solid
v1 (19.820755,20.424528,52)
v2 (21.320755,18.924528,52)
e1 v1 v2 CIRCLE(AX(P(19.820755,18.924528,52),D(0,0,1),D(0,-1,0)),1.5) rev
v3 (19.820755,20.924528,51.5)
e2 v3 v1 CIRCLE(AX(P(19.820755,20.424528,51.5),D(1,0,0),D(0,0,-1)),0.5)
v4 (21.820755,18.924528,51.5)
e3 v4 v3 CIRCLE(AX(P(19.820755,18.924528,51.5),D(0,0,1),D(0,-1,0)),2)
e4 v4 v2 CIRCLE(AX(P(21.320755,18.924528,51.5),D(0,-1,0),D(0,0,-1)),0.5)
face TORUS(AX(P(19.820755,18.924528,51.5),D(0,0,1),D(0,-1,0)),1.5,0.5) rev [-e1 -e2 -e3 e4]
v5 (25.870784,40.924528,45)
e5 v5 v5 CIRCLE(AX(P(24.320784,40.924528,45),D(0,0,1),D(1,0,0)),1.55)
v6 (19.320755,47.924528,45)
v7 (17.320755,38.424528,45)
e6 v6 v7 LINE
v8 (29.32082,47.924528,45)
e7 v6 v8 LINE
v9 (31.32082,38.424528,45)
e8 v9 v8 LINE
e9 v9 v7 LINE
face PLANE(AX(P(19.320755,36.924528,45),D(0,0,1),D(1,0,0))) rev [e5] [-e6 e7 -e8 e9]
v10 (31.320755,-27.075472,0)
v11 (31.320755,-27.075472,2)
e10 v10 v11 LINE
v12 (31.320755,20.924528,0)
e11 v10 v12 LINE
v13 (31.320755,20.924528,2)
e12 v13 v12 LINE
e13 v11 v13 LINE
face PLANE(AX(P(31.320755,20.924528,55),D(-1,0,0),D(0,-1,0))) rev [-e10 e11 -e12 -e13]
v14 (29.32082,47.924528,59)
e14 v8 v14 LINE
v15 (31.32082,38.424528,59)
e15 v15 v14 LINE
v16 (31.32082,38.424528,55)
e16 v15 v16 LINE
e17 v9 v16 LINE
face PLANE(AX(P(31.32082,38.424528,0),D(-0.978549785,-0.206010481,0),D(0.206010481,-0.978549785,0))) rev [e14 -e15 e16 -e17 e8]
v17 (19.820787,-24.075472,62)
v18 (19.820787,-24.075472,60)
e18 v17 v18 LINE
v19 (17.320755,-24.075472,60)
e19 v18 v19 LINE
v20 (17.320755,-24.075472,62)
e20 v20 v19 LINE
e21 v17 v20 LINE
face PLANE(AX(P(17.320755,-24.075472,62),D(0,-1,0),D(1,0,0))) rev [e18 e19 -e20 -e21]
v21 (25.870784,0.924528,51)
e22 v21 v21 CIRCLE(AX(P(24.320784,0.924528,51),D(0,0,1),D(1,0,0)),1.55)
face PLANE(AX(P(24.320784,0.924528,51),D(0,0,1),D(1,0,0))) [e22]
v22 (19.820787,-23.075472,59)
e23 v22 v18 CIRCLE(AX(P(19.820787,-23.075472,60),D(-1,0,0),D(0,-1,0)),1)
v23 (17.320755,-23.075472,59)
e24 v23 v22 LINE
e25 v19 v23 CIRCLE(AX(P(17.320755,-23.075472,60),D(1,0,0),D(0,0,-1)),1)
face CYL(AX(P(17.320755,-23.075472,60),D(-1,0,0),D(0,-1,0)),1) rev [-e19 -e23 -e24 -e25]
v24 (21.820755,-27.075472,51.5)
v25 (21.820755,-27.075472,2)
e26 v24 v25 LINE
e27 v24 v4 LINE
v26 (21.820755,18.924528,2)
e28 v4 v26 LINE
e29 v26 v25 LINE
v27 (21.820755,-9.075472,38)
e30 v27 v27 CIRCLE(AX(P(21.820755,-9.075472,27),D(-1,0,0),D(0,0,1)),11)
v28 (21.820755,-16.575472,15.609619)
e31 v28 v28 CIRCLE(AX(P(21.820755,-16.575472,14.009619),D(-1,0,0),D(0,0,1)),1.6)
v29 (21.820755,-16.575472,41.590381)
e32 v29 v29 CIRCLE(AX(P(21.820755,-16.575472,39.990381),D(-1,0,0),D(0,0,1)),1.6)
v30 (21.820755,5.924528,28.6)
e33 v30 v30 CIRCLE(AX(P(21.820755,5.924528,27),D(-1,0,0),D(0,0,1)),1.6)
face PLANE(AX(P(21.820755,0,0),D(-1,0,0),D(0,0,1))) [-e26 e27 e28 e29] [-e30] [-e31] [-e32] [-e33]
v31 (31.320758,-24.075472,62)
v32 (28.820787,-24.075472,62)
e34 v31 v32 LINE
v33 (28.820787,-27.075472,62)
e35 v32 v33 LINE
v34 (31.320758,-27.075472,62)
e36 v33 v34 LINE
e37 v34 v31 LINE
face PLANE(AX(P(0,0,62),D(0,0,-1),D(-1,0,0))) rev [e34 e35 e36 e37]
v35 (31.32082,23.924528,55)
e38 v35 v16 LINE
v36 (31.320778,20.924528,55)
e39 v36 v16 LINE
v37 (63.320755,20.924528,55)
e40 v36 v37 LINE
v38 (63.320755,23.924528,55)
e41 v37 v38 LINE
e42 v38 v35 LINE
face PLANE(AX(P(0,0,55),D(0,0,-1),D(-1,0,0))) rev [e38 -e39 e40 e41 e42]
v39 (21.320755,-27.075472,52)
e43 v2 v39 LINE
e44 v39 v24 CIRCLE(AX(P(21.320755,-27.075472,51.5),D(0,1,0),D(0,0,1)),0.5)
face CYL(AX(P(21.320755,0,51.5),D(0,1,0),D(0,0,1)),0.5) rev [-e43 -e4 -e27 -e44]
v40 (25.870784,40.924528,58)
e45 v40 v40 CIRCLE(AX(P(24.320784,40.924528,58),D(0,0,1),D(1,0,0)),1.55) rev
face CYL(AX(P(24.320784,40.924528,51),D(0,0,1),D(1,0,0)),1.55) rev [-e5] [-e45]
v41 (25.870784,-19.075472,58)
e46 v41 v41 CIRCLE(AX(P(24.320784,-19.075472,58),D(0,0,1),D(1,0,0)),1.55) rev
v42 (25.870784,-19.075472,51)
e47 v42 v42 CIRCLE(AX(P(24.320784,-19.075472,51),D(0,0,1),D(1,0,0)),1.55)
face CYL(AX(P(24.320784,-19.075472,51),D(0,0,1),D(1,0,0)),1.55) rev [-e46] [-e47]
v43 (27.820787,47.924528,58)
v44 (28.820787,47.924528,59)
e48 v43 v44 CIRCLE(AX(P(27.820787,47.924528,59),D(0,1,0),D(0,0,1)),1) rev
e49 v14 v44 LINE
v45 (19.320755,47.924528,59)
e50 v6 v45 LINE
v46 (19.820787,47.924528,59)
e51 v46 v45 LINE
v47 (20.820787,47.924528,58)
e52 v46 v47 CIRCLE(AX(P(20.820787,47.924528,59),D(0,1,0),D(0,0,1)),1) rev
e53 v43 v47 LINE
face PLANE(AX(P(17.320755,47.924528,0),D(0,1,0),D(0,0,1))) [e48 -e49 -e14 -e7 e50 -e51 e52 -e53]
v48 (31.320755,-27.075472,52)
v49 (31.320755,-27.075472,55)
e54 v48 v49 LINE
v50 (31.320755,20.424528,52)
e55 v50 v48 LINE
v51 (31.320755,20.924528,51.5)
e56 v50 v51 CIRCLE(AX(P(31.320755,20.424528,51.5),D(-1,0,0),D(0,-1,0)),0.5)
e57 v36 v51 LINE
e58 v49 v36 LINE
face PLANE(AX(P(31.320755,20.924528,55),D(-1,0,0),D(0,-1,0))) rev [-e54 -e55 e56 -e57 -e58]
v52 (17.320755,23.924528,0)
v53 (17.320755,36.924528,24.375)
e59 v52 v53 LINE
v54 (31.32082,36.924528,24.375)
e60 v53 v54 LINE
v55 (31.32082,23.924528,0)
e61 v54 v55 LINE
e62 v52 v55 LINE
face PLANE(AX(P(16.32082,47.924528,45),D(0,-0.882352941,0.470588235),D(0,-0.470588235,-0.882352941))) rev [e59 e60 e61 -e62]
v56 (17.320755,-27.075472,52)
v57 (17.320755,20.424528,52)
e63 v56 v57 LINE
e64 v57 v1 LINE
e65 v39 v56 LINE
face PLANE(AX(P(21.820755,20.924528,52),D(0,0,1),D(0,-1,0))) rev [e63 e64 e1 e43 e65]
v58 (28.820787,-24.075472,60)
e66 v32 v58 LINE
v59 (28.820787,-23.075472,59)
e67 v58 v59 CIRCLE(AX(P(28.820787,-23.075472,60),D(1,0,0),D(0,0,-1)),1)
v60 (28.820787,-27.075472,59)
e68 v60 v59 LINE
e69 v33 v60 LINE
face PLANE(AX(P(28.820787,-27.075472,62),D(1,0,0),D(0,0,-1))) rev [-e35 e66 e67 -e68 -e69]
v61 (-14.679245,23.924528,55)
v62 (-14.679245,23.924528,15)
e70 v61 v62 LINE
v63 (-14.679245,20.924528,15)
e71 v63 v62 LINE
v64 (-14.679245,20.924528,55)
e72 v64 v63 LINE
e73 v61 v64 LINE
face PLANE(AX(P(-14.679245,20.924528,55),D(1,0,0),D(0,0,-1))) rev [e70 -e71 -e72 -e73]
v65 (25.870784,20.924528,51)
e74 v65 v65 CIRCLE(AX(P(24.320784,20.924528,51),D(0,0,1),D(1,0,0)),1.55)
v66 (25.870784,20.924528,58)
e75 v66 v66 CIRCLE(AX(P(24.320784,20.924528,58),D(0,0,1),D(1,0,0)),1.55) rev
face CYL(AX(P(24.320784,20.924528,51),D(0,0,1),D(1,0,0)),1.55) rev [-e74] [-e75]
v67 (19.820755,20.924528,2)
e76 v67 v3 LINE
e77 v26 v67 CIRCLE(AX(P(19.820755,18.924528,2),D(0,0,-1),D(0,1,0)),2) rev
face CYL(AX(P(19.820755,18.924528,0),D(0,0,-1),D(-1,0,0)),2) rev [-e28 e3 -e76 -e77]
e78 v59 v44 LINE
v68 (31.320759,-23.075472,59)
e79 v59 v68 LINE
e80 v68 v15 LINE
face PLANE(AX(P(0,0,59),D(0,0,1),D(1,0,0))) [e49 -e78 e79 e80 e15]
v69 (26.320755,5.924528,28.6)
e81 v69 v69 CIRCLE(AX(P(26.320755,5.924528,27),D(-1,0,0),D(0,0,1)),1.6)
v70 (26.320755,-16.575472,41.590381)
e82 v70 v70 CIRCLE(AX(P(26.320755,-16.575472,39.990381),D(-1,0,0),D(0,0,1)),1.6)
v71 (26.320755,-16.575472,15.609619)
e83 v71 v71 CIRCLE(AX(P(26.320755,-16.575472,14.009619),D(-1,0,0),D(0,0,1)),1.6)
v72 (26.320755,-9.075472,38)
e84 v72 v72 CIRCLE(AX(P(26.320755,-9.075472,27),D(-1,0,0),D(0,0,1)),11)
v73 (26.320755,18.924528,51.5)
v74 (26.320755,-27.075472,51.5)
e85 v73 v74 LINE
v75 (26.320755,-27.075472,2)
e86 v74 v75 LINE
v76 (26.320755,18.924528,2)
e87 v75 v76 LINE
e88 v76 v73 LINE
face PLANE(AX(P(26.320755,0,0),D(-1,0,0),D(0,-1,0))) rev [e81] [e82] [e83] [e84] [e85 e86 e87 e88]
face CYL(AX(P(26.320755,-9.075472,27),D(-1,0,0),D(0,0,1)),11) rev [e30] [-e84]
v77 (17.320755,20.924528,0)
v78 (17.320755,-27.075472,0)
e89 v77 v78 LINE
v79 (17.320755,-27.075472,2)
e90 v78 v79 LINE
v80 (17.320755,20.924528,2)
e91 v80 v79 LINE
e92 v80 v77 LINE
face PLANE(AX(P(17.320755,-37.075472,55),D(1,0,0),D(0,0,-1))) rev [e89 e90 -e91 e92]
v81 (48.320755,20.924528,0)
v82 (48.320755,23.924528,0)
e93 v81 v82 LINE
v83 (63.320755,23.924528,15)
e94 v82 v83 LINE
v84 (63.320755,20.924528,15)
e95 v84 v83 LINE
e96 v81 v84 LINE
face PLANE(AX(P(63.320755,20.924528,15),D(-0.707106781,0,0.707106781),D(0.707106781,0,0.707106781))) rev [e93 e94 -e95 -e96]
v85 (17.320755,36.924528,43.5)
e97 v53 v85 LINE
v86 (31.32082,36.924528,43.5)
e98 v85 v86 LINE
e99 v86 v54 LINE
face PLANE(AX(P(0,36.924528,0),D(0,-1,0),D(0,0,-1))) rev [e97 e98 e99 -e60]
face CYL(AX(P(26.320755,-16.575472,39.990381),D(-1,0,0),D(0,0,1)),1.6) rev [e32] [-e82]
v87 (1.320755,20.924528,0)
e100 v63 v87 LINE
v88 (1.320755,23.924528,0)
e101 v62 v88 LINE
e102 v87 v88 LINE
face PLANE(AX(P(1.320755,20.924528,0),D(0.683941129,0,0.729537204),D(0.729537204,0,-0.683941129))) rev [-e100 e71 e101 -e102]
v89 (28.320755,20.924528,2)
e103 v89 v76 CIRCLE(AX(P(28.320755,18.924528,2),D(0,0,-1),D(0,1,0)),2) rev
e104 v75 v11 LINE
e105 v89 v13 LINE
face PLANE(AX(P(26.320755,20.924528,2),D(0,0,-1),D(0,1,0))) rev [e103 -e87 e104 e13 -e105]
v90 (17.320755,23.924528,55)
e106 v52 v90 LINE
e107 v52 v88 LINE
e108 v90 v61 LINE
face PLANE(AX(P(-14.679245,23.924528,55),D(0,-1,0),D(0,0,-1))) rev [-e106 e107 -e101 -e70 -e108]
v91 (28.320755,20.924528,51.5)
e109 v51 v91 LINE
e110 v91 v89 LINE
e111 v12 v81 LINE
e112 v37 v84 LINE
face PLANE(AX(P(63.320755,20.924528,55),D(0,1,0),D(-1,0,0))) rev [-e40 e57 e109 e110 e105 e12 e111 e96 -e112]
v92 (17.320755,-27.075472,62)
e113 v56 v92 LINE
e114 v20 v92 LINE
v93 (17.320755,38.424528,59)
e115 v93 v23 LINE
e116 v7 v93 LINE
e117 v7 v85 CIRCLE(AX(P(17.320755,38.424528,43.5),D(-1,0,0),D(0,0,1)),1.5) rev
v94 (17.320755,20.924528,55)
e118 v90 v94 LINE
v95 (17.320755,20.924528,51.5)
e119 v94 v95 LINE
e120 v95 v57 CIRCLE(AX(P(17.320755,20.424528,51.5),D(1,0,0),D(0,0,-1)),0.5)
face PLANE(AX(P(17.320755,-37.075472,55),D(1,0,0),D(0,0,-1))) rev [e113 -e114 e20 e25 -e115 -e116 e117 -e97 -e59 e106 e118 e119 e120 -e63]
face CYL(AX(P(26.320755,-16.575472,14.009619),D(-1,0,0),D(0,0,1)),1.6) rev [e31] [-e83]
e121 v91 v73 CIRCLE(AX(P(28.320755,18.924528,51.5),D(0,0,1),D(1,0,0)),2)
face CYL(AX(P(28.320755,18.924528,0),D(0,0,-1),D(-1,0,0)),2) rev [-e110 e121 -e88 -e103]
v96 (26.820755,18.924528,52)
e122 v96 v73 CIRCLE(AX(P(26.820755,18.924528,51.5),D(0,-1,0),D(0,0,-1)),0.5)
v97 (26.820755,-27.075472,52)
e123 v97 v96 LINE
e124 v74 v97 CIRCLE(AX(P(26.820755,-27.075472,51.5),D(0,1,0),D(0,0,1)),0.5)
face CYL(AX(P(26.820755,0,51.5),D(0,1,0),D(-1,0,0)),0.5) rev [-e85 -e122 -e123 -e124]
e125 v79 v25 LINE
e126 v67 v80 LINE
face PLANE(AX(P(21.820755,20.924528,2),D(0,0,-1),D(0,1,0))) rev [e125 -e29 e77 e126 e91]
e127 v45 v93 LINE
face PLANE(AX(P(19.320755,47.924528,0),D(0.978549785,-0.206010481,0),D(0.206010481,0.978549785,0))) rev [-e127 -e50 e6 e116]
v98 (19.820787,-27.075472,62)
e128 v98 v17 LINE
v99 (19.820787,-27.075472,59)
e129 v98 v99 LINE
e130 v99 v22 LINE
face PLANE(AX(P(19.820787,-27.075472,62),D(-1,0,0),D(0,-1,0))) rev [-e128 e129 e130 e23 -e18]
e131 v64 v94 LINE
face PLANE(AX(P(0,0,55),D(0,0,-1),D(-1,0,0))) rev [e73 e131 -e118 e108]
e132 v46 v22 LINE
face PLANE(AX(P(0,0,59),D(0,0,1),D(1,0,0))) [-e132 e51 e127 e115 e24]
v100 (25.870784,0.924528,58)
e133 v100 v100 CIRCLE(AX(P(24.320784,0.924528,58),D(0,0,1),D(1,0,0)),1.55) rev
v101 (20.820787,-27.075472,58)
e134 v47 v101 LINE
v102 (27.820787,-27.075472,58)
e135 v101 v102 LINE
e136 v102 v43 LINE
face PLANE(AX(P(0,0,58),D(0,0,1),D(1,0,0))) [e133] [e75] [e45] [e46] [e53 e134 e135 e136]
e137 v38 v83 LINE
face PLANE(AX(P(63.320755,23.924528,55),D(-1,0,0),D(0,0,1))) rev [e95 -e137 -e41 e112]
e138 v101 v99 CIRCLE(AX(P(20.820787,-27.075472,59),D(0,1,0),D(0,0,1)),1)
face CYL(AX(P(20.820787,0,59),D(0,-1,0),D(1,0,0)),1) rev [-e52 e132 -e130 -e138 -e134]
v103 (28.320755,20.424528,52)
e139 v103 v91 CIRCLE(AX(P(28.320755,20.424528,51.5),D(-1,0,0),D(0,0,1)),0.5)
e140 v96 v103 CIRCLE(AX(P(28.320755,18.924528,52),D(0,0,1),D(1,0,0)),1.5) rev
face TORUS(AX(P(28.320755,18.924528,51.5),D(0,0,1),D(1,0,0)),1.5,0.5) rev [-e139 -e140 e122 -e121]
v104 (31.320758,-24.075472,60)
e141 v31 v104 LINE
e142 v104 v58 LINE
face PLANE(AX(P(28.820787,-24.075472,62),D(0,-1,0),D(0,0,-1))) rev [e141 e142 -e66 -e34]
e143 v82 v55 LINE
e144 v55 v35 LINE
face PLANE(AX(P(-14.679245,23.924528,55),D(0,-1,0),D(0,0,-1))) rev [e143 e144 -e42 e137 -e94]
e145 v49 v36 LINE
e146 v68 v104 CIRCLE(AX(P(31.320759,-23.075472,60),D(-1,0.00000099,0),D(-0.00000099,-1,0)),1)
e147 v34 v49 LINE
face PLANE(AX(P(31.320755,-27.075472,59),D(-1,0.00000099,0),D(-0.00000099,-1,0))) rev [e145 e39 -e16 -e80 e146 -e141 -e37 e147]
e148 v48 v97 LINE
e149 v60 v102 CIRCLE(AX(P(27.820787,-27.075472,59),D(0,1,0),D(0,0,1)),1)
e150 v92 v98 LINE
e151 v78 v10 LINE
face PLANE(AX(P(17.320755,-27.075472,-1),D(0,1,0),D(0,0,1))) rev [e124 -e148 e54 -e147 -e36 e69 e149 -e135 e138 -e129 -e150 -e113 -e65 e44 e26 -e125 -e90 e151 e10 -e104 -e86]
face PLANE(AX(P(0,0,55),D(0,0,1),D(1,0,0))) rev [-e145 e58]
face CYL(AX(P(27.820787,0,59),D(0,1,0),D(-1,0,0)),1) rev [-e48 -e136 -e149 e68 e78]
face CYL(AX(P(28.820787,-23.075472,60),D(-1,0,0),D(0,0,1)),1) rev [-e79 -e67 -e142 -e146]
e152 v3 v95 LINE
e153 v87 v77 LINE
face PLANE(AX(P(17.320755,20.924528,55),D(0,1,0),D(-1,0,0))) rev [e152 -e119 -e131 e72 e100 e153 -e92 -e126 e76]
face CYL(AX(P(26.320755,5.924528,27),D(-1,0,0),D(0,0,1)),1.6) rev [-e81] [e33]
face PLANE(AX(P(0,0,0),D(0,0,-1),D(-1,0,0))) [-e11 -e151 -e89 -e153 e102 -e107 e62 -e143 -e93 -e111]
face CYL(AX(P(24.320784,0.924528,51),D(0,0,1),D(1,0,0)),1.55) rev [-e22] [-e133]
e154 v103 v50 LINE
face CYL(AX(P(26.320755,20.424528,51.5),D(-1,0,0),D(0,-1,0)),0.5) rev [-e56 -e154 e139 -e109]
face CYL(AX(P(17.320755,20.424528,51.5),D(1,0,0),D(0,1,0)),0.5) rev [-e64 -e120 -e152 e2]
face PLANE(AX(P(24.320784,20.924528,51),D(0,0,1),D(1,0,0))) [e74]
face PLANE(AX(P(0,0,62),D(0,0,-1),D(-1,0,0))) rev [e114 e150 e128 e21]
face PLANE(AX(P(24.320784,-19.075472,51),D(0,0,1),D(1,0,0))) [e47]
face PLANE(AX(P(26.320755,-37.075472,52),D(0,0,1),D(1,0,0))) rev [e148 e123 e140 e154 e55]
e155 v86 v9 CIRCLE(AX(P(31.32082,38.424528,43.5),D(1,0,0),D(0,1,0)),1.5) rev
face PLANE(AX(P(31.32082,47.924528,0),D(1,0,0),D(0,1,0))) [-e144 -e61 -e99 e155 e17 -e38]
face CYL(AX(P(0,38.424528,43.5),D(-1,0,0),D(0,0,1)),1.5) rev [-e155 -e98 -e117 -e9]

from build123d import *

# Parameters (mm, degrees)
EXTRUDE_2_DEPTH      = 55
SKETCH_5_W           = 50
SKETCH_5_H           = 58
CUT_EXTRUDE_2_DEPTH  = 4.5
SKETCH_6_R           = 11
SKETCH_6_R_2         = 1.6
CUT_EXTRUDE_3_DEPTH  = 4.5
SKETCH_8_W           = 14.000064841
SKETCH_8_H           = 24
EXTRUDE_3_DEPTH      = 55
SKETCH_9_R           = 1.55
CUT_EXTRUDE_4_DEPTH  = 4
CUT_EXTRUDE_8_DEPTH  = 55
CUT_EXTRUDE_12_DEPTH = 15
CUT_EXTRUDE_13_DEPTH = 3
SKETCH_23_W          = 50
SKETCH_23_H          = 58
CUT_EXTRUDE_14_DEPTH = 5
SKETCH_24_W          = 14
SKETCH_24_H          = 10
CUT_EXTRUDE_15_DEPTH = 56
FILLET_1_R           = 2
FILLET_2_R           = 2
FILLET_3_R           = 0.5
CUT_EXTRUDE_16_DEPTH = 11
FILLET_4_R           = 1.5
EXTRUDE_START        = 4
SKETCH_26_R          = 1.55
EXTRUDE_4_DEPTH      = 4
SKETCH_27_W          = 9
SKETCH_27_H          = 75
CUT_EXTRUDE_17_DEPTH = 1
FILLET_5_R           = 1
SKETCH_28_W          = 2.500032421
SKETCH_28_H          = 3
SKETCH_28_W_2        = 2.499970549
EXTRUDE_5_DEPTH      = 3
FILLET_6_R           = 1
SKETCH_29_R          = 1.55
CUT_EXTRUDE_18_DEPTH = 11


# Some blends are built 0.0001 mm under size
with BuildPart() as part:
    # 草图4 → 凸台-拉伸2 (new body)
    with BuildSketch(Plane.XY):
        Polygon((-14.679245283, 23.924528302), (63.320754717, 23.924528302), (63.320754717, 20.924528302), (31.320754717, 20.924528302), (31.320754717, -37.075471698), (17.320754717, -37.075471698), (17.320754717, 20.924528302), (-14.679245283, 20.924528302), align=None)
    extrude(amount=EXTRUDE_2_DEPTH)

    # 草图5 → 切除-拉伸2 (cut)
    with BuildSketch(Plane.ZY.offset(-17.320754717)):
        with Locations((27, -8.075471698)):
            Rectangle(SKETCH_5_W, SKETCH_5_H)
    extrude(amount=-CUT_EXTRUDE_2_DEPTH, mode=Mode.SUBTRACT)

    # 草图6 → 切除-拉伸3 (cut)
    with BuildSketch(Plane.ZY.offset(-21.820754717)):
        with Locations((27, -9.075471698)):
            Circle(SKETCH_6_R)
        with Locations((27, 5.924528302)):
            Circle(SKETCH_6_R_2)
        with Locations((39.990381057, -16.575471698)):
            Circle(SKETCH_6_R_2)
        with Locations((14.009618943, -16.575471698)):
            Circle(SKETCH_6_R_2)
    extrude(amount=-CUT_EXTRUDE_3_DEPTH, mode=Mode.SUBTRACT)

    # 草图8 → 凸台-拉伸3 (add)
    with BuildSketch(Plane.XY.offset(55)):
        with Locations((24.320787138, 35.924528302)):
            Rectangle(SKETCH_8_W, SKETCH_8_H)
    extrude(amount=-EXTRUDE_3_DEPTH)

    # 草图9 → 切除-拉伸4 (cut)
    with BuildSketch(Plane.XY.offset(55)):
        with Locations((24.320784468, 40.924528302)):
            Circle(SKETCH_9_R)
        with Locations((24.320784468, 20.924528302)):
            Circle(SKETCH_9_R)
        with Locations((24.320784468, 0.924528302)):
            Circle(SKETCH_9_R)
        with Locations((24.320784468, -19.075471698)):
            Circle(SKETCH_9_R)
    extrude(amount=-CUT_EXTRUDE_4_DEPTH, mode=Mode.SUBTRACT)

    # 草图13 → 切除-拉伸8 (cut)
    with BuildSketch(Plane.XY.offset(55)):
        Polygon((17.320754717, 47.924528302), (19.320754717, 47.924528302), (17.320754717, 38.424528302), align=None)
        Polygon((29.320819558, 47.924528302), (31.320819558, 47.924528302), (31.320819558, 38.424528302), align=None)
    extrude(amount=-CUT_EXTRUDE_8_DEPTH, mode=Mode.SUBTRACT)

    # 草图20 → 切除-拉伸12 (cut)
    with BuildSketch(Plane(origin=(31.320819558, 0, 0), x_dir=(0, 0, -1), z_dir=(1, 0, 0))):
        Polygon((0, 23.924528302), (0, 47.924528302), (-45, 47.924528302), align=None)
    extrude(amount=-CUT_EXTRUDE_12_DEPTH, mode=Mode.SUBTRACT)

    # 草图21 → 切除-拉伸13 (cut)
    with BuildSketch(Plane(origin=(0, 23.924528302, 0), x_dir=(1, 0, 0), z_dir=(0, 1, 0))):
        Polygon((-14.679245283, 0), (1.320754717, 0), (-14.679245283, -15), align=None)
        Polygon((48.320754717, 0), (63.320754717, 0), (63.320754717, -15), align=None)
    extrude(amount=-CUT_EXTRUDE_13_DEPTH, mode=Mode.SUBTRACT)

    # 草图23 → 切除-拉伸14 (cut)
    with BuildSketch(Plane(origin=(31.320754717, 0, 0), x_dir=(0, 0, -1), z_dir=(1, 0, 0))):
        with Locations((-27, -8.075471698)):
            Rectangle(SKETCH_23_W, SKETCH_23_H)
    extrude(amount=-CUT_EXTRUDE_14_DEPTH, mode=Mode.SUBTRACT)

    # 草图24 → 切除-拉伸15 (cut)
    with BuildSketch(Plane.XY.offset(55)):
        with Locations((24.320754717, -32.075471698)):
            Rectangle(SKETCH_24_W, SKETCH_24_H)
    extrude(amount=-CUT_EXTRUDE_15_DEPTH, mode=Mode.SUBTRACT)

    # 圆角1
    fillet_1_edges = [part.edges().sort_by_distance(p)[0] for p in [
        (21.820754717, 20.924528302, 27),
    ]]
    fillet(fillet_1_edges, radius=FILLET_1_R)

    # 圆角2
    fillet_2_edges = [part.edges().sort_by_distance(p)[0] for p in [
        (26.320754717, 20.924528302, 27),
    ]]
    fillet(fillet_2_edges, radius=FILLET_2_R)

    # 圆角3
    fillet_3_edges = [part.edges().sort_by_distance(p)[0] for p in [
        (21.820754717, -4.075471698, 52),
        (18.570754717, 20.924528302, 52),
        (21.234968279, 20.338741864, 52),
        (26.320754717, -4.075471698, 52),
        (29.820754717, 20.924528302, 52),
        (26.906541155, 20.338741864, 52),
    ]]
    fillet(fillet_3_edges, radius=FILLET_3_R)

    # 草图25 → 切除-拉伸16 (cut)
    with BuildSketch(Plane(origin=(0, 47.924528302, 0), x_dir=(1, 0, 0), z_dir=(0, 1, 0))):
        Polygon((19.320754717, -45), (17.320754717, -45), (17.320754717, -24), (31.320819558, -24), (31.320819558, -45), align=None)
    extrude(amount=-CUT_EXTRUDE_16_DEPTH, mode=Mode.SUBTRACT)

    # 圆角4
    fillet_4_edges = [part.edges().sort_by_distance(p)[0] for p in [
        (24.320787138, 36.924528302, 45),
    ]]
    fillet(fillet_4_edges, radius=FILLET_4_R)

    # 草图26 → 凸台-拉伸4 (add)
    with BuildSketch(Plane.XY.offset(55).offset(EXTRUDE_START)):
        Polygon((17.320754717, -27.075471698), (31.320754717, -27.075471698), (31.320819558, 38.424528302), (29.320819558, 47.924528302), (19.320754717, 47.924528302), (17.320754717, 38.424528302), align=None)
        with Locations((24.320784468, -19.075471698)):
            Circle(SKETCH_26_R, mode=Mode.SUBTRACT)
        with Locations((24.320784468, 0.924528302)):
            Circle(SKETCH_26_R, mode=Mode.SUBTRACT)
        with Locations((24.320784468, 20.924528302)):
            Circle(SKETCH_26_R, mode=Mode.SUBTRACT)
        with Locations((24.320784468, 40.924528302)):
            Circle(SKETCH_26_R, mode=Mode.SUBTRACT)
    extrude(amount=-EXTRUDE_4_DEPTH)

    # 草图27 → 切除-拉伸17 (cut)
    with BuildSketch(Plane.XY.offset(59)):
        with Locations((24.320787138, 10.424528302)):
            Rectangle(SKETCH_27_W, SKETCH_27_H)
    extrude(amount=-CUT_EXTRUDE_17_DEPTH, mode=Mode.SUBTRACT)

    # 圆角5
    fillet_5_edges = [part.edges().sort_by_distance(p)[0] for p in [
        (28.820787138, 10.424528302, 58),
        (19.820787138, 10.424528302, 58),
    ]]
    fillet(fillet_5_edges, radius=FILLET_5_R - 0.0001)  # a hair under: the kernel refuses the full size

    # 草图28 → 凸台-拉伸5 (add)
    with BuildSketch(Plane.XY.offset(59)):
        with Locations((18.570770927, -25.575471698)):
            Rectangle(SKETCH_28_W, SKETCH_28_H)
        with Locations((30.070772412, -25.575471698)):
            Rectangle(SKETCH_28_W_2, SKETCH_28_H)
    extrude(amount=EXTRUDE_5_DEPTH)

    # 圆角6
    # the kernel refuses this fillet: 1 mm, written as the material it adds along each edge
    with BuildSketch(Plane(origin=(19.820787138, -24.075471698, 59), x_dir=(0, 0, 1), z_dir=(-1, 0, 0))) as fillet_6_piece_1:
        with BuildLine():
            CenterArc((FILLET_6_R, FILLET_6_R), FILLET_6_R, 180, 90)
            Line((0, FILLET_6_R), (0, 0))
            Line((0, 0), (FILLET_6_R, 0))
        make_face()
    extrude(amount=2.500032421)
    with BuildSketch(Plane(origin=(33.820757687, -24.075471698, 59), x_dir=(0, 1, 0), z_dir=(-1, 0, 0))) as fillet_6_piece_2_section:
        with BuildLine():
            CenterArc((FILLET_6_R, -FILLET_6_R), FILLET_6_R, 90, 90)
            Line((0, -FILLET_6_R), (0, 0))
            Line((0, 0), (FILLET_6_R, 0))
        make_face()
    fillet_6_piece_2 = extrude(amount=4.999970549, mode=Mode.PRIVATE)
    fillet_6_piece_2 = split(fillet_6_piece_2, bisect_by=Plane(origin=(31.320757908, -23.852105032, 59.223367959), z_dir=(-0.9999999999995101, 9.899447945822129e-07, 0)), keep=Keep.TOP, mode=Mode.PRIVATE)
    add(fillet_6_piece_2)

    # 草图29 → 切除-拉伸18 (cut)
    with BuildSketch(Plane.XY.offset(51)):
        with Locations((24.320784468, 40.924528302)):
            Circle(SKETCH_29_R)
    extrude(amount=-CUT_EXTRUDE_18_DEPTH, mode=Mode.SUBTRACT)


solid = part.part
